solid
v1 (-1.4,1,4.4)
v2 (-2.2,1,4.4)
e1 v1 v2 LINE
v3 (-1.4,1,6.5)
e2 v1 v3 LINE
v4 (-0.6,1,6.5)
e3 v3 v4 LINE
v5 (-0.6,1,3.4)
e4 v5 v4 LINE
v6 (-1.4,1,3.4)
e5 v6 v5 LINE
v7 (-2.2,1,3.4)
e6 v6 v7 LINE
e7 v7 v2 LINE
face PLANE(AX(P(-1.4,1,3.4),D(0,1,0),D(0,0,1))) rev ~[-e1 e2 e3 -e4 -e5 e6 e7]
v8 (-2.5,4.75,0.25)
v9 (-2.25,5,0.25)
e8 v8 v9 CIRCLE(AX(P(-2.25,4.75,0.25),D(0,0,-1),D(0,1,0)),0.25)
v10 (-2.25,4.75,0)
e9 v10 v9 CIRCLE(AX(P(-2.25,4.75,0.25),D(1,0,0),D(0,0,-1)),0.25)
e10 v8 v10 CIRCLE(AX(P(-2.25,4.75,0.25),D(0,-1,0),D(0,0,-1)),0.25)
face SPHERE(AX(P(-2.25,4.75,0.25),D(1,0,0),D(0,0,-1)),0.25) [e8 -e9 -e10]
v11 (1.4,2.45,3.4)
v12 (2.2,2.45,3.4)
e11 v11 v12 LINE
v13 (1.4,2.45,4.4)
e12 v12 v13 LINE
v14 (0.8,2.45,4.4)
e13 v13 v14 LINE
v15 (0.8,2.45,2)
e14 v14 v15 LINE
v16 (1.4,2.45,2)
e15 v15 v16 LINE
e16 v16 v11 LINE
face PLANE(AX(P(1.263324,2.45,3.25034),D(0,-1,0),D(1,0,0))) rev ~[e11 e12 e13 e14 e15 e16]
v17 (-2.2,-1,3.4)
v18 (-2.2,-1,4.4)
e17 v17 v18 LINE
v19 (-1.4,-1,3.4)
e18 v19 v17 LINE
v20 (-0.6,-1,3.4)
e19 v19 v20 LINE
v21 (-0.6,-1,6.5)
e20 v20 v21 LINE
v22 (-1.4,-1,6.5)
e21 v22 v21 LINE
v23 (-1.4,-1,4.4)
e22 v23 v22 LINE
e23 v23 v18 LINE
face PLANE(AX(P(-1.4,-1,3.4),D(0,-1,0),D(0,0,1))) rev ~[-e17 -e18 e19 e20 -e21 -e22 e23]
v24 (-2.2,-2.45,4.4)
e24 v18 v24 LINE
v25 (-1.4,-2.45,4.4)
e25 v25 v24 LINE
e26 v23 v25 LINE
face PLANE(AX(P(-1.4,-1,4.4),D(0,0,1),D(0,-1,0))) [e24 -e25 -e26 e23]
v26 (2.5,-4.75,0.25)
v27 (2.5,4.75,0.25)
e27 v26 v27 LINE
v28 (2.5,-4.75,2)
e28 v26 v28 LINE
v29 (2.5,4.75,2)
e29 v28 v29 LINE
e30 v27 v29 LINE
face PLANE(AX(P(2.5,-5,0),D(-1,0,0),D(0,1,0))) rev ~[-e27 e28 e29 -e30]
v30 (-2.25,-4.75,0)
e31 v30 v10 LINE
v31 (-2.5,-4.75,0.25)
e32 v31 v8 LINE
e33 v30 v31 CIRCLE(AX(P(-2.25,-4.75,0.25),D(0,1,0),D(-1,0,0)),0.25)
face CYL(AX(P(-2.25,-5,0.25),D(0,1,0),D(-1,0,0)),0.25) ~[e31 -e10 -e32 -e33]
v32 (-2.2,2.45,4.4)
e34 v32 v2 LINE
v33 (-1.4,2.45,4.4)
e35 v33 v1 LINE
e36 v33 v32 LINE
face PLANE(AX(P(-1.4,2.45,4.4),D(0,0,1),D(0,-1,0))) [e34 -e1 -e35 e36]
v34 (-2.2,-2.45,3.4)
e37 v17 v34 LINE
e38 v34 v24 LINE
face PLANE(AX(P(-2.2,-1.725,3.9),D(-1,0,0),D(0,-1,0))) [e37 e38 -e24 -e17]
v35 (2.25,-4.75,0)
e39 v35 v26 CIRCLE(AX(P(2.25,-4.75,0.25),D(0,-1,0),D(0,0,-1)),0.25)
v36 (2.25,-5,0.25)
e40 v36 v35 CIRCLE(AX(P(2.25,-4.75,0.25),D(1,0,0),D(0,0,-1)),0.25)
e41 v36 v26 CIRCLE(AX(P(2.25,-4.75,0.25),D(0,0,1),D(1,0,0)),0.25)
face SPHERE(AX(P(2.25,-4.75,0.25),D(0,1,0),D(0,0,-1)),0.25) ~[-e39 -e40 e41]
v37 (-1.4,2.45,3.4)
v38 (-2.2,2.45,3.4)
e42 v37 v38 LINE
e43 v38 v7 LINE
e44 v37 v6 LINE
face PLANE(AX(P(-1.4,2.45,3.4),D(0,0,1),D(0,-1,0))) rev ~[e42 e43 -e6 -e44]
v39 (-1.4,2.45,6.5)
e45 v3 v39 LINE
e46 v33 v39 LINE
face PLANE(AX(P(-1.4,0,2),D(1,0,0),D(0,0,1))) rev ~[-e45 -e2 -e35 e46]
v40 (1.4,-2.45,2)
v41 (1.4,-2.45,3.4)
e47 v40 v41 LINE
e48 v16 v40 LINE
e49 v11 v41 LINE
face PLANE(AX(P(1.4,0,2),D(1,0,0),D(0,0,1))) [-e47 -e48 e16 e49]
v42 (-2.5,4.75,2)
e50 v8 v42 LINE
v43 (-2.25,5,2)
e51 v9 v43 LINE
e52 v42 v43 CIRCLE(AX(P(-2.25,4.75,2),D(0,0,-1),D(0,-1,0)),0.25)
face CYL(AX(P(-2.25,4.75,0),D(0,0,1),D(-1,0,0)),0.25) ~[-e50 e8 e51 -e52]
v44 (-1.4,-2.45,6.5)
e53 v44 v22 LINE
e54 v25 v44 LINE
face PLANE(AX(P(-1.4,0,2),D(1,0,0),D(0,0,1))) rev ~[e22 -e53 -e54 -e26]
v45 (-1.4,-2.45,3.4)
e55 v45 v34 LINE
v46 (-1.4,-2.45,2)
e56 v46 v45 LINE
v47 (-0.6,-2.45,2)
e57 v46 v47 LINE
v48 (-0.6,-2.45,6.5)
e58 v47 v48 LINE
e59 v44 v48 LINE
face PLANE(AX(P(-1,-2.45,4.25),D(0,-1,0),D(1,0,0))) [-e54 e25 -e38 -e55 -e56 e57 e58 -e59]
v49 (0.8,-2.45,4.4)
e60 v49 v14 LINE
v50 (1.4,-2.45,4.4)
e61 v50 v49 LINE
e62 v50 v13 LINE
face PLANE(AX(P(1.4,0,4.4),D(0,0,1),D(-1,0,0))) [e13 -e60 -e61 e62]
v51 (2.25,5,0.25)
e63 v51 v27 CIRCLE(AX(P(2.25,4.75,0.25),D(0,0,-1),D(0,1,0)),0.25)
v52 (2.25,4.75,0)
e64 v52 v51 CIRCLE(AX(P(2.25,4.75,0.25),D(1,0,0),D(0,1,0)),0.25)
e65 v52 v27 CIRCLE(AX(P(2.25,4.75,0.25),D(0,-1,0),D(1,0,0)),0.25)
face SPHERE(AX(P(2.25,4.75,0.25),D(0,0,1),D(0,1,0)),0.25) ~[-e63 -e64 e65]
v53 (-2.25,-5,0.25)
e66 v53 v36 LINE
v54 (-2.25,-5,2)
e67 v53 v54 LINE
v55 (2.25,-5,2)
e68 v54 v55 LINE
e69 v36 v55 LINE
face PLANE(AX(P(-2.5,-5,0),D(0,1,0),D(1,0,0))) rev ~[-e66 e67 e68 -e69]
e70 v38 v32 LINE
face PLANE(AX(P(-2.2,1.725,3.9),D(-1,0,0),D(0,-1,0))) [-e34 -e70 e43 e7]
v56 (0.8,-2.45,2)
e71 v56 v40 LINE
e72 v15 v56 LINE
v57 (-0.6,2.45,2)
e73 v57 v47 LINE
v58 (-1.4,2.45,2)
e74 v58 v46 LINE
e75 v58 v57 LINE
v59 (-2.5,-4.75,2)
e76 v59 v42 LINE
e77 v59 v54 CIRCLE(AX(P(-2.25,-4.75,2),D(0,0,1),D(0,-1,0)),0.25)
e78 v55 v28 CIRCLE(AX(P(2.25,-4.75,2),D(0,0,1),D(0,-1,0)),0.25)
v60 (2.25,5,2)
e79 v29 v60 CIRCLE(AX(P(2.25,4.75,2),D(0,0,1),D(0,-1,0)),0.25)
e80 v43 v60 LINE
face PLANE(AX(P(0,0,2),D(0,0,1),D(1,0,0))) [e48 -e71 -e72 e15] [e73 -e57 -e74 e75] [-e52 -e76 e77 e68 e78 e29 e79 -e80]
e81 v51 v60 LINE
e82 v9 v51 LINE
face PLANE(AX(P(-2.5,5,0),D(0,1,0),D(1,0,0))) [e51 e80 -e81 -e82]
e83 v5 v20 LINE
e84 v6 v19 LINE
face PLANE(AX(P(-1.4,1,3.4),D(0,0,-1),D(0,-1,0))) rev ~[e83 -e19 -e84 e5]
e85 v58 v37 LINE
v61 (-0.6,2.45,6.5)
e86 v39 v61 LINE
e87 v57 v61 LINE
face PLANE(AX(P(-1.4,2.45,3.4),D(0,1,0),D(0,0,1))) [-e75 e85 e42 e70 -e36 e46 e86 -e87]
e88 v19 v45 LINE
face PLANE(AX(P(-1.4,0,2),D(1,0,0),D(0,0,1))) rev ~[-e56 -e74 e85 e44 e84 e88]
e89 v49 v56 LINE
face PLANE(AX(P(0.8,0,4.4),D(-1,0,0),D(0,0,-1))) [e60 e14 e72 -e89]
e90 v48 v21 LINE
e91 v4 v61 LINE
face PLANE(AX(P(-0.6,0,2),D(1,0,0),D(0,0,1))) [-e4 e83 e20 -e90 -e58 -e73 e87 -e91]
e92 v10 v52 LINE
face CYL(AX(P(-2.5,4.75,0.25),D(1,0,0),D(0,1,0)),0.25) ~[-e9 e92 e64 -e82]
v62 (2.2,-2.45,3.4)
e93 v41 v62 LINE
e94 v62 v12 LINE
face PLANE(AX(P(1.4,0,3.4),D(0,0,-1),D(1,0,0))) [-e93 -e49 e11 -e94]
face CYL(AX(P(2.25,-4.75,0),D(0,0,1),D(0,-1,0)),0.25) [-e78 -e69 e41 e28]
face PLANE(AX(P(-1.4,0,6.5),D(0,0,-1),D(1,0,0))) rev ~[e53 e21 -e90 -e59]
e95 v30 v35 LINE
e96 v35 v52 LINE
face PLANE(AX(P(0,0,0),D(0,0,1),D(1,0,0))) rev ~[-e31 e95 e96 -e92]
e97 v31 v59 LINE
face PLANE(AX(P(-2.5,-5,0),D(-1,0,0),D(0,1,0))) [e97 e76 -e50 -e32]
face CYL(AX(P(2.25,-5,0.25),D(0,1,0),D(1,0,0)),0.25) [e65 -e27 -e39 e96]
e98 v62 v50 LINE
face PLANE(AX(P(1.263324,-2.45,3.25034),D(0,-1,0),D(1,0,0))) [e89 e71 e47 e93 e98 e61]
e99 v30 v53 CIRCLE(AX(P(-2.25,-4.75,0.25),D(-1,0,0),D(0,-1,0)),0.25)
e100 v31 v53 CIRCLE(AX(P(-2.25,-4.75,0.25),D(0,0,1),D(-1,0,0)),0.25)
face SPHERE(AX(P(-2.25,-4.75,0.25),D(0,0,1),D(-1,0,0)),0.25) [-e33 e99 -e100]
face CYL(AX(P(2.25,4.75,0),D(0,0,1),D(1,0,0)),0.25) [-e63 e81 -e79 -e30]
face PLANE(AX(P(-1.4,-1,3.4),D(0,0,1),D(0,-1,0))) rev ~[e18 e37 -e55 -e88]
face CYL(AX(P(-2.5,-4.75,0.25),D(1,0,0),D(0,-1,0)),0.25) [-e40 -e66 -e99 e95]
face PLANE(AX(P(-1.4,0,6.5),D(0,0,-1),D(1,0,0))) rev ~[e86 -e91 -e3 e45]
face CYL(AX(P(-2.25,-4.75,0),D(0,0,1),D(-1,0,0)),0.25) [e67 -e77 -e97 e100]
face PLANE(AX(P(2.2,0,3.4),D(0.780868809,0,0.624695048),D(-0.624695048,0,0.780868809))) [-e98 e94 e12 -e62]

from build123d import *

# Parameters (mm, degrees)
F0_W      = 5
F0_H      = 10
F1_DEPTH  = 2
F2_R      = 0.25
F4_DEPTH  = 2.45
F5_W      = 0.8
F5_H      = 4.5
F6_DEPTH  = 2.45
F7_W      = 2
F7_H      = 3.1
F8_DEPTH  = 0.8
F9_W      = 1.45
F9_H      = 1
F10_DEPTH = 0.8


# Not quite as in the source:
# - a feature names something its author has since deleted; it is built from what else it names


with BuildPart() as f1:
    # F0 (on Top) → F1 (new body)
    with BuildSketch(Plane.XY):
        Rectangle(F0_W, F0_H)
    extrude(amount=F1_DEPTH)

    # F2
    f2_edges = [f1.edges().sort_by_distance(p)[0] for p in [
        (2.5, 5, 1),
        (-2.5, -5, 1),
        (0, 5, 0),
        (2.5, 0, 0),
        (-2.5, 0, 0),
        (0, -5, 0),
        (-2.5, 5, 1),
        (2.5, -5, 1),
    ]]
    fillet(f2_edges, radius=F2_R)

    # F3 (on Front) → F4 (join, symmetric)
    with BuildSketch(Plane.XZ):
        Polygon((0.8, 4.4), (0.8, 2), (1.4, 2), (1.4, 3.4), (2.2, 3.4), (1.4, 4.4), align=None)
    extrude(amount=F4_DEPTH, both=True)

    # F5 (on Front) → F6 (join, symmetric)
    with BuildSketch(Plane.XZ):
        with Locations((-1, 4.25)):
            Rectangle(F5_W, F5_H)
    extrude(amount=F6_DEPTH, both=True)

    # F7 (on face) → F8 (cut, through all)
    with BuildSketch(Plane(origin=(-1.4, 0, 0), x_dir=(0, -1, 0), z_dir=(-1, 0, 0))):
        with Locations((0, 4.95)):
            Rectangle(F7_W, F7_H)
    extrude(amount=-F8_DEPTH, mode=Mode.SUBTRACT)

    # F9 (on face) → F10 (join)
    with BuildSketch(Plane(origin=(-1.4, 0, 0), x_dir=(0, -1, 0), z_dir=(-1, 0, 0))):
        with Locations((-1.725, 3.9)):
            Rectangle(F9_W, F9_H)
        with Locations((1.725, 3.9)):
            Rectangle(F9_W, F9_H)
    extrude(amount=F10_DEPTH)


solid = f1.part
